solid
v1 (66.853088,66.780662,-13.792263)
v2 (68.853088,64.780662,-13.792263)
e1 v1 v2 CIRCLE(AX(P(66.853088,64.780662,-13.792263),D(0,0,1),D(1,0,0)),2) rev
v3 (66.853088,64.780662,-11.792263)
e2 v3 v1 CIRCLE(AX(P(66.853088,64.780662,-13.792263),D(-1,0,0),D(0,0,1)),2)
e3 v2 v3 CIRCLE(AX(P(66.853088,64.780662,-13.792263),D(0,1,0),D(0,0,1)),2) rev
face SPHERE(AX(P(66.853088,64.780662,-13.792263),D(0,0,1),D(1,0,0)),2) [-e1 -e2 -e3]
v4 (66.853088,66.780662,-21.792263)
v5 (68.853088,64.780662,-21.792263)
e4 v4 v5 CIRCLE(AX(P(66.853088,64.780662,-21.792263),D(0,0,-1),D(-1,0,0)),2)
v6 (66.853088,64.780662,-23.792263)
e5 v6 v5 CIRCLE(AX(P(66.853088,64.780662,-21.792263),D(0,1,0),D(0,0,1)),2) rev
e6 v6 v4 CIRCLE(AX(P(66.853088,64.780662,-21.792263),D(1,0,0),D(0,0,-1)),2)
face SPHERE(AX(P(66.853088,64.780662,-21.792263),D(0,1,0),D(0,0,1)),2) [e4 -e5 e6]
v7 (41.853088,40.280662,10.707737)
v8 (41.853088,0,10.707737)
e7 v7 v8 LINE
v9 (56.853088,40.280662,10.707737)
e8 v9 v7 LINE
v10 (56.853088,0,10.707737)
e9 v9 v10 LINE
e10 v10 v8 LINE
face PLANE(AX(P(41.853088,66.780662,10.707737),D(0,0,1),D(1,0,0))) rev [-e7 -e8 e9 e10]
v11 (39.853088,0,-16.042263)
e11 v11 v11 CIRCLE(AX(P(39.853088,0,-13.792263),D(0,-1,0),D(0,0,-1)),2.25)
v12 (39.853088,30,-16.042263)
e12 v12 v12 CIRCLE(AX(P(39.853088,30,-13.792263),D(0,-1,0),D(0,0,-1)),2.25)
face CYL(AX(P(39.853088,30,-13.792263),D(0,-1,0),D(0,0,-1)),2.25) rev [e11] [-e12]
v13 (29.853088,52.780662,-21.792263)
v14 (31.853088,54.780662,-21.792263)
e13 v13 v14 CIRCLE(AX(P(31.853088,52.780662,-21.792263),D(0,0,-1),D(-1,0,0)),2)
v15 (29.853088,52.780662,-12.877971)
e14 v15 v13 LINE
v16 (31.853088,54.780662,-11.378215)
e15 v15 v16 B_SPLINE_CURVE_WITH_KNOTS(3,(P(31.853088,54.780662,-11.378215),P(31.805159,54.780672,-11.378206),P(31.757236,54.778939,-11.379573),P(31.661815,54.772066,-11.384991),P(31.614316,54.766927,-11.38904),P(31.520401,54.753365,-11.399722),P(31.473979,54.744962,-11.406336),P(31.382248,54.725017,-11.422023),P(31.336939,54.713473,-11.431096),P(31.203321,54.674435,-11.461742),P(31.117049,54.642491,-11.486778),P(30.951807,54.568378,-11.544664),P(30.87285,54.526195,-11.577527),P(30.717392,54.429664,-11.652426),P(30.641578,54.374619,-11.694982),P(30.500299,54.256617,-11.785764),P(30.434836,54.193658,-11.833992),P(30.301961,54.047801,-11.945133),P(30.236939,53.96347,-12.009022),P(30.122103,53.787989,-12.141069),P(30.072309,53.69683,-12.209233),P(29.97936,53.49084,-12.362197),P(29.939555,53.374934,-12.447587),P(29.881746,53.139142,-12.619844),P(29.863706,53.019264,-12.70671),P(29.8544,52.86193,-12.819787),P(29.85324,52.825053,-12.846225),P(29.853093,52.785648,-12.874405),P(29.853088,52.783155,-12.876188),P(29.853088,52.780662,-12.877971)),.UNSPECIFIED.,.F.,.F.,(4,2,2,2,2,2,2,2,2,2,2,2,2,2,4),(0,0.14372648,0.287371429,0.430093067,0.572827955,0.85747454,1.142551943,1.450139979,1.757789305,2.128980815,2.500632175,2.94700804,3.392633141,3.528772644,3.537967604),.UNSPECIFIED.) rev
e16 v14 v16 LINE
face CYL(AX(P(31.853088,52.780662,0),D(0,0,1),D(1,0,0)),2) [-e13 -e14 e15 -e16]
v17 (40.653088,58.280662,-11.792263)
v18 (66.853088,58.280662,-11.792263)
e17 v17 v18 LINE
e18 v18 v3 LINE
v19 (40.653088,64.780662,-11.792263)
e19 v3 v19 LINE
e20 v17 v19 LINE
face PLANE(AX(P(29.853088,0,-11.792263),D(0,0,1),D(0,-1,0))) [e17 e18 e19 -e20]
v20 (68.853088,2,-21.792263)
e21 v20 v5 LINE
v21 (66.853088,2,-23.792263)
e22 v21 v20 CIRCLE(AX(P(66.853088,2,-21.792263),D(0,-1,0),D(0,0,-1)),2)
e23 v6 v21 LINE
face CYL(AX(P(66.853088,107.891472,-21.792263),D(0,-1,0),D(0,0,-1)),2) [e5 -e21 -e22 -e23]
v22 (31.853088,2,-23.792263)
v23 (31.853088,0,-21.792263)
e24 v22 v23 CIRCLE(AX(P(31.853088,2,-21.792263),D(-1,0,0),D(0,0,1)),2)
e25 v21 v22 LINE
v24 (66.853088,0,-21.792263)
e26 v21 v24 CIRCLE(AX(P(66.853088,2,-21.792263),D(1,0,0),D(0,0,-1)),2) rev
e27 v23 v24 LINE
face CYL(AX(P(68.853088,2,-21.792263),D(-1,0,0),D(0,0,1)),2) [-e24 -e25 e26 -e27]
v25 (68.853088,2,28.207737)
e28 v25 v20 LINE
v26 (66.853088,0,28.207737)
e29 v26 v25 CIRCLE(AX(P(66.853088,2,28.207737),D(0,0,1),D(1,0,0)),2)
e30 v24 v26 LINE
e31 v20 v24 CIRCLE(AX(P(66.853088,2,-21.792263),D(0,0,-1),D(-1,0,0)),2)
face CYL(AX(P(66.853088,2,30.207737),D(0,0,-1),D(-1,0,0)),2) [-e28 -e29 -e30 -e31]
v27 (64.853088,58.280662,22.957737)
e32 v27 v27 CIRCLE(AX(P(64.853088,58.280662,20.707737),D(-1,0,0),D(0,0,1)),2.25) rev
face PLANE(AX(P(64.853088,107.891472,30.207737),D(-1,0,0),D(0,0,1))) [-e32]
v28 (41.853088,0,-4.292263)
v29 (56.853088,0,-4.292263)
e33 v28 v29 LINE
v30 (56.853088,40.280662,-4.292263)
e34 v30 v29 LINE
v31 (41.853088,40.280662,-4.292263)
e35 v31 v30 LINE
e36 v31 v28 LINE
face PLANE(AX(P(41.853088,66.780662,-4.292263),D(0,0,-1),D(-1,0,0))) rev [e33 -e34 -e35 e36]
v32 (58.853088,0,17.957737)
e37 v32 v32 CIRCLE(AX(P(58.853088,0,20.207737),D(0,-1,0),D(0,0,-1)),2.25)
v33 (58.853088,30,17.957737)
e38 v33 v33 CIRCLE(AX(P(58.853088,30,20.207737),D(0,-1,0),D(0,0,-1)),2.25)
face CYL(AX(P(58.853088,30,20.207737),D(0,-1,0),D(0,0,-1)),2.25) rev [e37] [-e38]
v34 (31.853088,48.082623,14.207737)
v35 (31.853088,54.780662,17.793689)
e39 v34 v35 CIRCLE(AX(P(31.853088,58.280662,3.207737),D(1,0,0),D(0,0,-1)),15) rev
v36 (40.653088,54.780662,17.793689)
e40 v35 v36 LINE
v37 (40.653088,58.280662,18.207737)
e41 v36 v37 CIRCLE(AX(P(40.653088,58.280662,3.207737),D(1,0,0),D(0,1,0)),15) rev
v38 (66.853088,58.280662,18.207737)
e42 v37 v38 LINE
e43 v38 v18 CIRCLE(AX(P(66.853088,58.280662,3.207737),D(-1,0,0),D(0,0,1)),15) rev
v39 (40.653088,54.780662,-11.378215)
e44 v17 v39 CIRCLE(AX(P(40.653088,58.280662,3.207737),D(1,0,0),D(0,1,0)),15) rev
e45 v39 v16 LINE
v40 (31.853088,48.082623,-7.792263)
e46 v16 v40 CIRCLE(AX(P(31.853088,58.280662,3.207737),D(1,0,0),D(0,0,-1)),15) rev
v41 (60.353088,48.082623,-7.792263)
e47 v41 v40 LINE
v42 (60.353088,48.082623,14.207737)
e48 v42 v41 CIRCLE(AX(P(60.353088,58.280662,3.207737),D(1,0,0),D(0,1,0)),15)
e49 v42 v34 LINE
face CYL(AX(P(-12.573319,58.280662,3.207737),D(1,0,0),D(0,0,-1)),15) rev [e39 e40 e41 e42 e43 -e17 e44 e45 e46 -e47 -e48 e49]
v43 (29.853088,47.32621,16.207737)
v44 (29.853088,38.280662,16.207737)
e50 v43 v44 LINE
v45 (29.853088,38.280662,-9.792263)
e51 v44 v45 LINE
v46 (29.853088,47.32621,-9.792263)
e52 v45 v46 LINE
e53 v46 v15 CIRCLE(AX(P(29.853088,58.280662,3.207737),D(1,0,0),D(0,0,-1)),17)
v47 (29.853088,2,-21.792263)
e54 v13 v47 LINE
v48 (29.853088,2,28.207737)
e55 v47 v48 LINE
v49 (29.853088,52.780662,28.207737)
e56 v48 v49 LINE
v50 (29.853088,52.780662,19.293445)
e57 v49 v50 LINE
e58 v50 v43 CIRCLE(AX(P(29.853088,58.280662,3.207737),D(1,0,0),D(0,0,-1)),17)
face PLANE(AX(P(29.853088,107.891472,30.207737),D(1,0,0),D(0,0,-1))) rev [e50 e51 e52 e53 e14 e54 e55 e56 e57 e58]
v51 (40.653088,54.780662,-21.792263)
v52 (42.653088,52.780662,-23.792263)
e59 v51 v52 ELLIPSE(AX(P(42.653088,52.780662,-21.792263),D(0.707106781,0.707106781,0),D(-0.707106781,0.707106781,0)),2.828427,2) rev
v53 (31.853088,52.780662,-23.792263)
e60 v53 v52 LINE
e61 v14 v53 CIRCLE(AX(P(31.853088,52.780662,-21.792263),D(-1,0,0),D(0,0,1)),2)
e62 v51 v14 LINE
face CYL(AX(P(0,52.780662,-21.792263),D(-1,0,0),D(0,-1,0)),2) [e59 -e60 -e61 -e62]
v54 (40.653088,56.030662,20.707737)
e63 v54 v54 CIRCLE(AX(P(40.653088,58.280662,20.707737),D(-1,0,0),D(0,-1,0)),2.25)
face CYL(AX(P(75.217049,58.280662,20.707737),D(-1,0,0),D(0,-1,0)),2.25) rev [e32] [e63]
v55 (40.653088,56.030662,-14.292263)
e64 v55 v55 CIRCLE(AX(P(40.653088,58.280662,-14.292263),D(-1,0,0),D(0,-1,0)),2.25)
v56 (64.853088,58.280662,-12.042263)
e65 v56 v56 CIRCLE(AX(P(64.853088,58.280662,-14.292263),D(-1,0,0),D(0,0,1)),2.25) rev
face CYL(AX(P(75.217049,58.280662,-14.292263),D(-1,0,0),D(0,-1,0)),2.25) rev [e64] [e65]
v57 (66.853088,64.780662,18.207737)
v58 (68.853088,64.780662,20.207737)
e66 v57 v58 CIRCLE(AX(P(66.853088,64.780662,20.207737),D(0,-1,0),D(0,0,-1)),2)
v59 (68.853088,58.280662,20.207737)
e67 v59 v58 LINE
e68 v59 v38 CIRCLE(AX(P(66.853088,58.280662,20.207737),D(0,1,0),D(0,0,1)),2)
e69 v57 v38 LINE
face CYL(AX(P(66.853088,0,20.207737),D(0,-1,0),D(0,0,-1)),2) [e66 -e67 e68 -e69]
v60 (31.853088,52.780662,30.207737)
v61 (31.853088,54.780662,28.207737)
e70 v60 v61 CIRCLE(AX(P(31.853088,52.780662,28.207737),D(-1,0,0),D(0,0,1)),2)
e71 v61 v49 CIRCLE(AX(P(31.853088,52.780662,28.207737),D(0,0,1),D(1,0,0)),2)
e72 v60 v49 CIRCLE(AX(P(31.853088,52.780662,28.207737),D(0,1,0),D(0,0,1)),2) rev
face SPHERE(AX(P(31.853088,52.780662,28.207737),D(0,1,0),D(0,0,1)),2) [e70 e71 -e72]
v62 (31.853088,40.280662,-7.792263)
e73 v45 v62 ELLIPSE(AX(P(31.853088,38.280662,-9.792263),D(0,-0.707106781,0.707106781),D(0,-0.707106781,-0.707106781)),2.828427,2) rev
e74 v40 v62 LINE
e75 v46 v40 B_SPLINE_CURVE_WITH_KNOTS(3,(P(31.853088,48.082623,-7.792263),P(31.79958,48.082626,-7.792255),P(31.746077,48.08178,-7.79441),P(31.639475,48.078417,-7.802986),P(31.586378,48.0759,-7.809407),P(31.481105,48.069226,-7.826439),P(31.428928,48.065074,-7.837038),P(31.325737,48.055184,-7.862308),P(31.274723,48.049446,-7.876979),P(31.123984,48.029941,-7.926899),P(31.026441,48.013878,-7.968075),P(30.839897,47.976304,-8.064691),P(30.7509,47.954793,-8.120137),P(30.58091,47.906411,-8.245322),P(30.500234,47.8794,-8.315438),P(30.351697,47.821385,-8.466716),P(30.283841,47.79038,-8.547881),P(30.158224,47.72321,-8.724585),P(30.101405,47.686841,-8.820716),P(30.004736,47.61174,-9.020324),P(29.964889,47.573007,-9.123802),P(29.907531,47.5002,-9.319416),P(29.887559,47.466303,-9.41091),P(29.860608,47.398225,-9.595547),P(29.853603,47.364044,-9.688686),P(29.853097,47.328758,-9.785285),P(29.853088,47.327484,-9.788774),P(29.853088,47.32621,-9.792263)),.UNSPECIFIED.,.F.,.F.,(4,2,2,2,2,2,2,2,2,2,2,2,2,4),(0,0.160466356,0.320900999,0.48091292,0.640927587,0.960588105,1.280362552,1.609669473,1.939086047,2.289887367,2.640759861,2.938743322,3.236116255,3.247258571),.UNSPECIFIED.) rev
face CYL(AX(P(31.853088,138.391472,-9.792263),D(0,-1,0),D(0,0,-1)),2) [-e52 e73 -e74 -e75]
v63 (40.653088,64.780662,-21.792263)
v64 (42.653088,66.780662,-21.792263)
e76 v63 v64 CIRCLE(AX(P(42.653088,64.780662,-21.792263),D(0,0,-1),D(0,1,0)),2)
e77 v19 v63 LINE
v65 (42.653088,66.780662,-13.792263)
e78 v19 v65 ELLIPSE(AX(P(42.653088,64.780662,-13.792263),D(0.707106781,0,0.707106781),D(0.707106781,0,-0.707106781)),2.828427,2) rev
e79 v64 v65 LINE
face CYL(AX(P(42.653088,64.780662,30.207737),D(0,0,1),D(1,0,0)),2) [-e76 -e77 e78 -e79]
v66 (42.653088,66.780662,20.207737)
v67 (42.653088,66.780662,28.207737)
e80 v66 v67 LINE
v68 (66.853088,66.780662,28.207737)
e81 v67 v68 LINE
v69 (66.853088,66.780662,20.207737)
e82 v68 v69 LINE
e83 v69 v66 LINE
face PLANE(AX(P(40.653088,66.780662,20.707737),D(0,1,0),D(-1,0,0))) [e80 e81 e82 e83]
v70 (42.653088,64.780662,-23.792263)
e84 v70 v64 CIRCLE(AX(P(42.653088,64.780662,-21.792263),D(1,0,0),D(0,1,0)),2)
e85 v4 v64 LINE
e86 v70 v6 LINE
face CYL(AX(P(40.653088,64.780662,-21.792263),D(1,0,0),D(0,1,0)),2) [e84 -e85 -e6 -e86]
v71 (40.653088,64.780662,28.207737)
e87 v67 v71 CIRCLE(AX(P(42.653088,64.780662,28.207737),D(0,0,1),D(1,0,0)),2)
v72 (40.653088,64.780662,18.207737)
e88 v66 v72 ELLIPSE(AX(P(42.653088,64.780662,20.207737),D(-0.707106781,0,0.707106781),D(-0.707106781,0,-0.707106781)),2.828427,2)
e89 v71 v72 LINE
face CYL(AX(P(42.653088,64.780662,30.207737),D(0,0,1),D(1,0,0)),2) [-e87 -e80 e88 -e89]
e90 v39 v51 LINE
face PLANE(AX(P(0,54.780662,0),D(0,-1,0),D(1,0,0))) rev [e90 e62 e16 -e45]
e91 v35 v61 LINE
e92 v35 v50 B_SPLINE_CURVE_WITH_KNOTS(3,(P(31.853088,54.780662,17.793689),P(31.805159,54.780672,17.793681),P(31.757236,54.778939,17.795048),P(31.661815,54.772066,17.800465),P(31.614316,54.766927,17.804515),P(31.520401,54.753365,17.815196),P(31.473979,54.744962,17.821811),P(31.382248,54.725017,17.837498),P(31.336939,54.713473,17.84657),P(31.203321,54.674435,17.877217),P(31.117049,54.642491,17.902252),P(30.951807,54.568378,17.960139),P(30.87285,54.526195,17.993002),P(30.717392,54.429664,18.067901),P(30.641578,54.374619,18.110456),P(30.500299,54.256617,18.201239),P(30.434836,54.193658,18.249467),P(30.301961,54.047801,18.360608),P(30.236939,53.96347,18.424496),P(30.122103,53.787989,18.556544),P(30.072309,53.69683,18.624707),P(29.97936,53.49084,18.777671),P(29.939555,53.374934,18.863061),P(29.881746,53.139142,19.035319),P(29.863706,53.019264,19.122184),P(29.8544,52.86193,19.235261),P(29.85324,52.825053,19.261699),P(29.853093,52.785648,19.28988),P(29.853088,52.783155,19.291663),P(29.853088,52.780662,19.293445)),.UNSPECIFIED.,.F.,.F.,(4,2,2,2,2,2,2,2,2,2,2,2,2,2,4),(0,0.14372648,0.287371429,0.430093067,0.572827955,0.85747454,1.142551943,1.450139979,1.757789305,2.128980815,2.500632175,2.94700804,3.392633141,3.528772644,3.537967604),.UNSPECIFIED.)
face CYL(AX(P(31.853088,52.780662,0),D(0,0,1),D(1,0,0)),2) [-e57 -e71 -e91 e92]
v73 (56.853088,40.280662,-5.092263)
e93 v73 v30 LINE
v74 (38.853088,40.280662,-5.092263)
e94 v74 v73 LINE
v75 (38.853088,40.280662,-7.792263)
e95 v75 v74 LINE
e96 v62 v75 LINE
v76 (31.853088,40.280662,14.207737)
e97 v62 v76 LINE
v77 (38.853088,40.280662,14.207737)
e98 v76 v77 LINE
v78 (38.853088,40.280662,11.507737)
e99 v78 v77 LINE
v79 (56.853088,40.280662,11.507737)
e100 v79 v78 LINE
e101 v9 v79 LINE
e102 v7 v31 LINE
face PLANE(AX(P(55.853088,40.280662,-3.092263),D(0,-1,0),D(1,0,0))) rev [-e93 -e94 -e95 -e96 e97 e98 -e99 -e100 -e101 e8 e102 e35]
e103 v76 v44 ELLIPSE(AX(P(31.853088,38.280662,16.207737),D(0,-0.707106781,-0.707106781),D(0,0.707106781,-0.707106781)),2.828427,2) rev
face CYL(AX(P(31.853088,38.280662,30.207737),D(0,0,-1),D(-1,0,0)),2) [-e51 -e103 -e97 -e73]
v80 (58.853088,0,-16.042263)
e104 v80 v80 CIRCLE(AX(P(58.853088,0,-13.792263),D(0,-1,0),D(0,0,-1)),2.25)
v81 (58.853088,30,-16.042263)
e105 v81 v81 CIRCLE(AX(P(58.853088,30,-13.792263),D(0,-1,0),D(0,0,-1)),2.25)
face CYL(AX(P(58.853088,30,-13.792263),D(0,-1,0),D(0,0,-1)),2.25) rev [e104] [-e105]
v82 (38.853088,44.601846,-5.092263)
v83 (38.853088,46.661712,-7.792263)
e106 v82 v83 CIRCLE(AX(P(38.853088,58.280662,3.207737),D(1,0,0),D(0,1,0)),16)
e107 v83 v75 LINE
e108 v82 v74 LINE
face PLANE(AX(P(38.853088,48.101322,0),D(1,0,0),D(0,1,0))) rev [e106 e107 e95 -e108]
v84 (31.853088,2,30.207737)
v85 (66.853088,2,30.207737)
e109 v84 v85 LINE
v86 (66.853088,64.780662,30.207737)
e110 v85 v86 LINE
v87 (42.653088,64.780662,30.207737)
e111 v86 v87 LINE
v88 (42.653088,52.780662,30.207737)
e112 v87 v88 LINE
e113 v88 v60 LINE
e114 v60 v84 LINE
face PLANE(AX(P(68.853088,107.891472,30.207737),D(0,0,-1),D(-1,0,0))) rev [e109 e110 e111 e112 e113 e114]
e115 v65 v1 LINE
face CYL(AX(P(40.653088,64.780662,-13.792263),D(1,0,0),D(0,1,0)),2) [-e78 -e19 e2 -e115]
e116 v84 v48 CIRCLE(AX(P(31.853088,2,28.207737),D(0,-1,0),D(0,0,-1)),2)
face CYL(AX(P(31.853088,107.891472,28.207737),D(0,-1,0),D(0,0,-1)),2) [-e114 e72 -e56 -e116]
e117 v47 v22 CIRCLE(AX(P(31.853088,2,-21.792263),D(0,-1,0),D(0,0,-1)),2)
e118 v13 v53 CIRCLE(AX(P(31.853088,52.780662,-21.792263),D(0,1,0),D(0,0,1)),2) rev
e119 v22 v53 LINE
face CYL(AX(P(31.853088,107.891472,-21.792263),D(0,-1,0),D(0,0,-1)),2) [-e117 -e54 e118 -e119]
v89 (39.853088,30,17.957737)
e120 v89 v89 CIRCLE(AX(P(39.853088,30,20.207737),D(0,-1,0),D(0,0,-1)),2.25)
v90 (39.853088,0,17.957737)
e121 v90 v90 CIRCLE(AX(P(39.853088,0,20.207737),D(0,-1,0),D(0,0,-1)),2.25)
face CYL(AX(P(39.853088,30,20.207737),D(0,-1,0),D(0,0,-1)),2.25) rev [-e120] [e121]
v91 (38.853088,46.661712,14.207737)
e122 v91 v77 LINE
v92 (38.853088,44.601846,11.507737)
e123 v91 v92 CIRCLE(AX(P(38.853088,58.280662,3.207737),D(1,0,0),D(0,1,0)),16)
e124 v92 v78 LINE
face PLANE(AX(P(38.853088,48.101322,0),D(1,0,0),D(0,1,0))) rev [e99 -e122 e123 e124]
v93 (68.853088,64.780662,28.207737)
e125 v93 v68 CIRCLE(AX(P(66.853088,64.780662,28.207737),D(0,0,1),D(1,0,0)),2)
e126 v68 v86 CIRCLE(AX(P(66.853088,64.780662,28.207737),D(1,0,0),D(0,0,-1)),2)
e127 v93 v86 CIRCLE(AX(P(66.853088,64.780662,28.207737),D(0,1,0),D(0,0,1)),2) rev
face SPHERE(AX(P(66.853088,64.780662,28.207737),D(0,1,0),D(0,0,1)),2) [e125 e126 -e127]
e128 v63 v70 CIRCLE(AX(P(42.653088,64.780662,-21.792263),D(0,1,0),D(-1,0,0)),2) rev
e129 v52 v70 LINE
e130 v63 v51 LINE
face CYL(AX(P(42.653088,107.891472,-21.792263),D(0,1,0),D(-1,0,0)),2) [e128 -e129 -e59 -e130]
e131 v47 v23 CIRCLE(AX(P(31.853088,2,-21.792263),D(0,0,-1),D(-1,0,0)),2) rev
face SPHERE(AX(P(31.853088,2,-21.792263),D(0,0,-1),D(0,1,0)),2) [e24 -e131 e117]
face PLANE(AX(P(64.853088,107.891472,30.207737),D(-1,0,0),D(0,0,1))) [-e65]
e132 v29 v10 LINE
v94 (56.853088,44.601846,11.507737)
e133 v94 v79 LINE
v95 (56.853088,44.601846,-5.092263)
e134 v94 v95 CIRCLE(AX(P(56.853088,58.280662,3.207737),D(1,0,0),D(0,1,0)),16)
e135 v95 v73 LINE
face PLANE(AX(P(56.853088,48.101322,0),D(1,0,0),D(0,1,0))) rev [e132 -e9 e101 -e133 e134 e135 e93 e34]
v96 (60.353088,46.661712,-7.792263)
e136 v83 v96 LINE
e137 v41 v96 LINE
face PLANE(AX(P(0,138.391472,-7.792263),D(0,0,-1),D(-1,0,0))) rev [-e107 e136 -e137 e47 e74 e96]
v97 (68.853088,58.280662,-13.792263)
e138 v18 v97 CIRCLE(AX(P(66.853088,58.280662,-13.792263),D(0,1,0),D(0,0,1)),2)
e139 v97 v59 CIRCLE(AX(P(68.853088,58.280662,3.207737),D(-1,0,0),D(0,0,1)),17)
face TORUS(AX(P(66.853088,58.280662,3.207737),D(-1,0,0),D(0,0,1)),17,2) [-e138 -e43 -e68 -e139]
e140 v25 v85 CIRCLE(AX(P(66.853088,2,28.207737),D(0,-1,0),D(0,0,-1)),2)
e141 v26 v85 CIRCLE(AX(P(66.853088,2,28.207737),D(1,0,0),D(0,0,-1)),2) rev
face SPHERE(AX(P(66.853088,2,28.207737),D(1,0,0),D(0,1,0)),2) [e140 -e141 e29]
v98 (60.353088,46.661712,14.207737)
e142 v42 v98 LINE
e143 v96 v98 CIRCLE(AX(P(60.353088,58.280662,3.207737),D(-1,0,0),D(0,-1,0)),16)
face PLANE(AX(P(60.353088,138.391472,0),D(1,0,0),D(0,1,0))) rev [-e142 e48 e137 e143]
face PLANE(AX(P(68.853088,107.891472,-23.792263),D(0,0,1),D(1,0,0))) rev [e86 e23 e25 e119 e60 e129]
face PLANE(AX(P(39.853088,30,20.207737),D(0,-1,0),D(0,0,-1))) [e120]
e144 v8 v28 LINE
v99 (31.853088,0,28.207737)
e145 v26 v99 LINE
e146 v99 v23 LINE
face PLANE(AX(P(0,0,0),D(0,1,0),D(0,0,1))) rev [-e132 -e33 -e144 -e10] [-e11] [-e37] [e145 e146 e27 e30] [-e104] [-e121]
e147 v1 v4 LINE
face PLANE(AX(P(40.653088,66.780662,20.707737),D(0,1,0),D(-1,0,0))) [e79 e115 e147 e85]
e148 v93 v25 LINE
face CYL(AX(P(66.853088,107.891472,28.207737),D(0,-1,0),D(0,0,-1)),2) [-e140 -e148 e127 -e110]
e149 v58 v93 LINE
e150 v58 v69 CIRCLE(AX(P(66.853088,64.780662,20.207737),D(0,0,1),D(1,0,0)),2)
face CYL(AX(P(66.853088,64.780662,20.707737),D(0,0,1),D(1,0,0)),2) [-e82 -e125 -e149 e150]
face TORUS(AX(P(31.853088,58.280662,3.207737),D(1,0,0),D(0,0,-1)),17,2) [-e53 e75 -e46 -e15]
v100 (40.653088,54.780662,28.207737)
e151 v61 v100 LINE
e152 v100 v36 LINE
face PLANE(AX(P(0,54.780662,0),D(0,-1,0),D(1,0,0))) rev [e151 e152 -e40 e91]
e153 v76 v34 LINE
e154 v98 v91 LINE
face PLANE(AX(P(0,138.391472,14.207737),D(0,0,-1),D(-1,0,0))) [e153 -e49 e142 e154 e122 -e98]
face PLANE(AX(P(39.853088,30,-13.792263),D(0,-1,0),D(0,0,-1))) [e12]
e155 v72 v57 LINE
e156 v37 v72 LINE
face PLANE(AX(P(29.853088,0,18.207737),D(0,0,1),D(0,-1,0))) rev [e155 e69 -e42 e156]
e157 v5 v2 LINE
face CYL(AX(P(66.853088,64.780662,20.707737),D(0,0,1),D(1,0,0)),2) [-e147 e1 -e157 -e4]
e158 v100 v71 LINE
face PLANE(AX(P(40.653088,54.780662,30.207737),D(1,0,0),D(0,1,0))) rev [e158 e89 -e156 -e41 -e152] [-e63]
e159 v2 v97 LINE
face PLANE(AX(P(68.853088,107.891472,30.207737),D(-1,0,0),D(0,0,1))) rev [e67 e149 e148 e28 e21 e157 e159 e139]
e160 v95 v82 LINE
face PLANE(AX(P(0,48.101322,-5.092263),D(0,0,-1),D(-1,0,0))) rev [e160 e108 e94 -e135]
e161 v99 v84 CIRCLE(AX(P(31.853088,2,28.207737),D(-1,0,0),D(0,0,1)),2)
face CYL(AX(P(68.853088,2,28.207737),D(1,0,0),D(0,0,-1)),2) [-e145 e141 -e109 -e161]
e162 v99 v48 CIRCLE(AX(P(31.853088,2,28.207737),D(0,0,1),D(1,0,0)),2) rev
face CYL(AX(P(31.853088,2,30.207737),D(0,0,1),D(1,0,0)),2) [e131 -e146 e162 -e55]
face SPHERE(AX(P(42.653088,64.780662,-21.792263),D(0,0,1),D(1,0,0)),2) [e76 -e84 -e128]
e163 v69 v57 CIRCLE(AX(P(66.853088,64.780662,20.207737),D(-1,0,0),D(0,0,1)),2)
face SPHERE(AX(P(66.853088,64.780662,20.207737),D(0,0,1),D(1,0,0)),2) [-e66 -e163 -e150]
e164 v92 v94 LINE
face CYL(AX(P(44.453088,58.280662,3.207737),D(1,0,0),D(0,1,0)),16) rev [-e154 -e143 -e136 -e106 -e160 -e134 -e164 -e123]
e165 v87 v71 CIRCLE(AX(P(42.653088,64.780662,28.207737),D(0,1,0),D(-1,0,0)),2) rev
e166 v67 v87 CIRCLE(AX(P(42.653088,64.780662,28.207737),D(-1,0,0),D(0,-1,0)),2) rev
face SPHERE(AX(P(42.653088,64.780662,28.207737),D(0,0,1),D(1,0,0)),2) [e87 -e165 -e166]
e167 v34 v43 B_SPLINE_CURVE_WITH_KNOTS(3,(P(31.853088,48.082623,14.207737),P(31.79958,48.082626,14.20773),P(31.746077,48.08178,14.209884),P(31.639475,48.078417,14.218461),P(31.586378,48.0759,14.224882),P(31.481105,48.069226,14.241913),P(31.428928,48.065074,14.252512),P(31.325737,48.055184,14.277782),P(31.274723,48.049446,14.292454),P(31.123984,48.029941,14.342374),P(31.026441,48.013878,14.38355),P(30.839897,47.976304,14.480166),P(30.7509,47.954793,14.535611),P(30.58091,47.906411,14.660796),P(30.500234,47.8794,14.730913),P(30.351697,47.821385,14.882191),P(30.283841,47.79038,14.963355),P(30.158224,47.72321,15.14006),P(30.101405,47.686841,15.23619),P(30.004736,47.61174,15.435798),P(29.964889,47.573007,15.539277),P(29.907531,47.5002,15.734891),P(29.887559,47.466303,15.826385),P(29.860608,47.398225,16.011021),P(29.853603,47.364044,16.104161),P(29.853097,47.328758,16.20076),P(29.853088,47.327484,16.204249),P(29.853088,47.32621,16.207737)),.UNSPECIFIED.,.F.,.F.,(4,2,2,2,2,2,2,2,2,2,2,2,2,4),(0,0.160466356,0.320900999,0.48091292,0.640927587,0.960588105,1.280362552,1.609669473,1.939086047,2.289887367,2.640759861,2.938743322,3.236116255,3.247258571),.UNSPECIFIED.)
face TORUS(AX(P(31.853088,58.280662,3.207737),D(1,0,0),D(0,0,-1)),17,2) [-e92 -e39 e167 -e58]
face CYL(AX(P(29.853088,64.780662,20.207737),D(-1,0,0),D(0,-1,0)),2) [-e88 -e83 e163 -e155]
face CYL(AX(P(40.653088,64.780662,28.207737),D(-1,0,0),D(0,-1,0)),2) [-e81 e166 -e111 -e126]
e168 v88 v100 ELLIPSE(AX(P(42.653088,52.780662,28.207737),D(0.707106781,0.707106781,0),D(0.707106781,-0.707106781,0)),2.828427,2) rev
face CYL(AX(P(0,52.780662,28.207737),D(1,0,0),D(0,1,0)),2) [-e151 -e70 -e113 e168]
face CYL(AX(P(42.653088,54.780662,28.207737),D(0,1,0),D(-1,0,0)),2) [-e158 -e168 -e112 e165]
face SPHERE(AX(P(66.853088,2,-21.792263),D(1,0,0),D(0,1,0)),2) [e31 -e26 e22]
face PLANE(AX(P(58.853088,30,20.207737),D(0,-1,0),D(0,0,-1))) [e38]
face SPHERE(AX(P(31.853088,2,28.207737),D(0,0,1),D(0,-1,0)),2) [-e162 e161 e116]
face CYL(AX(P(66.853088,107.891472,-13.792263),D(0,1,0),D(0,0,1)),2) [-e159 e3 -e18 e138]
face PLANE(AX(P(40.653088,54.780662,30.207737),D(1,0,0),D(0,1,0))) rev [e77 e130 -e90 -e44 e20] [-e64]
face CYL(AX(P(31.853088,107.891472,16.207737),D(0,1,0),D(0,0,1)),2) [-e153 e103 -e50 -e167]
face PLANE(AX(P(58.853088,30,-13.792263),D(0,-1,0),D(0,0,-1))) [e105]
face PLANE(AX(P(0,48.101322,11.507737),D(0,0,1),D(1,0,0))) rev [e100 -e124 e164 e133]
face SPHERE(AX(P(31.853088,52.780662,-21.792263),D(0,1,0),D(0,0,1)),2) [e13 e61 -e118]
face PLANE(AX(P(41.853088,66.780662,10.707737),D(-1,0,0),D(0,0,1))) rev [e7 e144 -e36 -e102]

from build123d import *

# Parameters (mm, degrees)
CROQUIS18_W                  = 39
CROQUIS18_H                  = 54
SALIENTE_EXTRUIR8_DEPTH      = 40.280661595
SALIENTE_EXTRUIR9_REACH      = 87.298
SALIENTE_EXTRUIR9_END_RADIUS = 16
SALIENTE_EXTRUIR10_DEPTH     = 26.5
CORTAR_EXTRUIR8_START        = -39
CROQUIS22_R                  = 15
CORTAR_EXTRUIR8_DEPTH        = 39
CORTAR_EXTRUIR9_DEPTH        = 84.025081472
CROQUIS24_W                  = 10.8
CROQUIS24_H                  = 54
CORTAR_EXTRUIR10_DEPTH       = 12
CROQUIS25_R                  = 2.25
CORTAR_EXTRUIR11_DEPTH       = 24.2
REDONDEO1_R                  = 2
REDONDEO2_R                  = 2
CROQUIS26_R                  = 2.25
CORTAR_EXTRUIR12_DEPTH       = 30
CROQUIS27_W                  = 15
CROQUIS27_H                  = 15
CORTAR_EXTRUIR13_DEPTH       = 101.562974791


with BuildPart() as part:
    # Croquis18 → Saliente-Extruir8 (new body)
    with BuildSketch(Plane(origin=(0, 0, 0), x_dir=(1, 0, 0), z_dir=(0, 1, 0))):
        with Locations((49.353088131, -3.207737261)):
            Rectangle(CROQUIS18_W, CROQUIS18_H)
    extrude(amount=SALIENTE_EXTRUIR8_DEPTH)

    # Saliente-Extruir9: up to this cylinder (the profile starts outside it)
    saliente_extruir9_end = Plane(origin=(39.1607, 58.280661595, 3.207737261), z_dir=(1, 0, 0)) * Cylinder(SALIENTE_EXTRUIR9_END_RADIUS, 207.596, mode=Mode.PRIVATE)
    # Croquis20 → Saliente-Extruir9 (add, up to the surface)
    with BuildSketch(Plane(origin=(0, 40.280661595, 0), x_dir=(1, 0, 0), z_dir=(0, 1, 0)), mode=Mode.PRIVATE) as saliente_extruir9_sk1:
        Polygon((38.853088131, -11.507737261), (38.853088131, -14.207737261), (60.353088131, -14.207737261), (60.353088131, 7.792262739), (38.853088131, 7.792262739), (38.853088131, 5.092262739), (56.853088131, 5.092262739), (56.853088131, -11.507737261), align=None)
    saliente_extruir9_tool1 = extrude(saliente_extruir9_sk1.sketch, amount=SALIENTE_EXTRUIR9_REACH, mode=Mode.PRIVATE) - saliente_extruir9_end
    add(saliente_extruir9_tool1.solids().sort_by_distance((39.1607, 40.280662, 12.857737))[0])

    # Croquis21 → Saliente-Extruir10 (add)
    with BuildSketch(Plane(origin=(0, 40.280661595, 0), x_dir=(1, 0, 0), z_dir=(0, 1, 0))):
        Polygon((68.853088131, 23.792262739), (29.853088131, 23.792262739), (29.853088131, 7.792262739), (60.353088131, 7.792262739), (60.353088131, -14.207737261), (29.853088131, -14.207737261), (29.853088131, -30.207737261), (68.853088131, -30.207737261), align=None)
    extrude(amount=SALIENTE_EXTRUIR10_DEPTH)

    # Croquis22 → Cortar-Extruir8 (cut)
    with BuildSketch(Plane(origin=(68.853088131, 0, 0), x_dir=(0, 0, -1), z_dir=(1, 0, 0)).offset(CORTAR_EXTRUIR8_START)):
        with Locations((-3.207737261, 58.280661595)):
            Circle(CROQUIS22_R)
    extrude(amount=CORTAR_EXTRUIR8_DEPTH, mode=Mode.SUBTRACT)

    # Croquis23 → Cortar-Extruir9 (cut, through all)
    with BuildSketch(Plane(origin=(68.853088131, 0, 0), x_dir=(0, 0, -1), z_dir=(1, 0, 0))):
        with BuildLine():
            Line((-15.566944355, 66.780661595), (-18.207737261, 66.780661595))
            Line((-18.207737261, 66.780661595), (-18.207737261, 58.280661595))
            ThreePointArc((-18.207737261, 58.280661595), (-17.532333353, 62.731048859), (-15.566944355, 66.780661595))
        make_face()
        with BuildLine():
            ThreePointArc((9.151469833, 66.780661595), (11.116858831, 62.731048859), (11.792262739, 58.280661595))
            Line((11.792262739, 58.280661595), (11.792262739, 66.780661595))
            Line((11.792262739, 66.780661595), (9.151469833, 66.780661595))
        make_face()
    extrude(amount=-CORTAR_EXTRUIR9_DEPTH, mode=Mode.SUBTRACT)

    # Croquis24 → Cortar-Extruir10 (cut)
    with BuildSketch(Plane(origin=(0, 66.780661595, 0), x_dir=(1, 0, 0), z_dir=(0, 1, 0))):
        with Locations((35.253088131, -3.207737261)):
            Rectangle(CROQUIS24_W, CROQUIS24_H)
    extrude(amount=-CORTAR_EXTRUIR10_DEPTH, mode=Mode.SUBTRACT)

    # Croquis25 → Cortar-Extruir11 (cut)
    with BuildSketch(Plane.ZY.offset(-40.653088131)):
        with Locations(Location((20.707737261, 58.280661595, 0), (0, 0, 270))):
            Circle(CROQUIS25_R)
        with Locations(Location((-14.292262739, 58.280661595, 0), (0, 0, 270))):
            Circle(CROQUIS25_R)
    extrude(amount=-CORTAR_EXTRUIR11_DEPTH, mode=Mode.SUBTRACT)

    # Redondeo1
    redondeo1_edges = [part.edges().sort_by_distance(p)[0] for p in [
        (68.853088131, 62.530661595, 18.207737261),
        (68.853088131, 62.530661595, -11.792262739),
        (68.853088131, 33.390330798, -23.792262739),
        (54.753088131, 66.780661595, 30.207737261),
        (29.853088131, 27.390330798, 30.207737261),
        (68.853088131, 33.390330798, 30.207737261),
        (29.853088131, 27.390330798, -23.792262739),
        (29.853088131, 51.200842989, -10.016338076),
        (29.853088131, 54.780661595, -17.585238812),
        (29.853088131, 54.780661595, 24.000713334),
        (40.653088131, 60.780661595, -23.792262739),
        (35.253088131, 54.780661595, -23.792262739),
        (35.253088131, 54.780661595, 30.207737261),
        (40.653088131, 60.780661595, 30.207737261),
        (29.853088131, 40.280661595, 3.207737261),
        (49.353088131, 0, -23.792262739),
        (68.853088131, 0, 3.207737261),
        (68.853088131, 66.780661595, 24.207737261),
        (54.753088131, 66.780661595, -23.792262739),
        (49.353088131, 0, 30.207737261),
        (29.853088131, 0, 3.207737261),
        (29.853088131, 44.181642082, -7.792262739),
        (29.853088131, 44.181642082, 14.207737261),
        (29.853088131, 51.200842989, 16.431812597),
        (68.853088131, 43.280661596, 3.207737261),
        (68.853088131, 66.780661595, -17.792262739),
    ]]
    fillet(redondeo1_edges, radius=REDONDEO1_R)

    # Redondeo2
    # the kernel refuses this fillet: 2 mm, written as the material it takes off along each edge
    with BuildSketch(Plane(origin=(66.853088131, 64.780661595, -13.792262739), x_dir=(0, 1, 0), z_dir=(0, 0, 1))) as redondeo2_piece_1_section:
        Polygon((0, 0), (REDONDEO2_R, 0), (REDONDEO2_R, -REDONDEO2_R), (0, -REDONDEO2_R), align=None)
    redondeo2_piece_1 = extrude(amount=REDONDEO2_R, mode=Mode.PRIVATE)
    redondeo2_piece_1 = redondeo2_piece_1 - Plane(origin=(66.853088131, 64.780661595, -13.792262739), x_dir=(-0.7071067811865475, -0.7071067811865476, 0), z_dir=(0, 0, 1)) * Sphere(REDONDEO2_R, mode=Mode.PRIVATE)
    add(redondeo2_piece_1, mode=Mode.SUBTRACT)
    with BuildSketch(Plane(origin=(66.853088131, 64.780661595, 20.207737261), x_dir=(0, 0, -1), z_dir=(0, 1, 0))) as redondeo2_piece_2_section:
        Polygon((0, 0), (REDONDEO2_R, 0), (REDONDEO2_R, -REDONDEO2_R), (0, -REDONDEO2_R), align=None)
    redondeo2_piece_2 = extrude(amount=REDONDEO2_R, mode=Mode.PRIVATE)
    redondeo2_piece_2 = redondeo2_piece_2 - Plane(origin=(66.853088131, 64.780661595, 20.207737261), x_dir=(-0.7071067811865475, 0, 0.7071067811865475), z_dir=(0, 1, 0)) * Sphere(REDONDEO2_R, mode=Mode.PRIVATE)
    add(redondeo2_piece_2, mode=Mode.SUBTRACT)
    with BuildSketch(Plane(origin=(42.653088131, 64.780661595, -21.792262739), x_dir=(0, 1, 0), z_dir=(-1, 0, 0))) as redondeo2_piece_3_section:
        Polygon((0, 0), (REDONDEO2_R, 0), (REDONDEO2_R, REDONDEO2_R), (0, REDONDEO2_R), align=None)
    redondeo2_piece_3 = extrude(amount=REDONDEO2_R, mode=Mode.PRIVATE)
    redondeo2_piece_3 = redondeo2_piece_3 - Plane(origin=(42.653088131, 64.780661595, -21.792262739), x_dir=(0, -0.7071067811865475, 0.7071067811865475), z_dir=(-1, 0, 0)) * Sphere(REDONDEO2_R, mode=Mode.PRIVATE)
    add(redondeo2_piece_3, mode=Mode.SUBTRACT)
    with BuildSketch(Plane(origin=(42.653088131, 64.780661595, 28.207737261), x_dir=(-1, 0, 0), z_dir=(0, 1, 0))) as redondeo2_piece_4_section:
        Polygon((0, 0), (REDONDEO2_R, 0), (REDONDEO2_R, REDONDEO2_R), (0, REDONDEO2_R), align=None)
    redondeo2_piece_4 = extrude(amount=REDONDEO2_R, mode=Mode.PRIVATE)
    redondeo2_piece_4 = redondeo2_piece_4 - Plane(origin=(42.653088131, 64.780661595, 28.207737261), x_dir=(0.7071067811865475, 0, -0.7071067811865476), z_dir=(0, 1, 0)) * Sphere(REDONDEO2_R, mode=Mode.PRIVATE)
    add(redondeo2_piece_4, mode=Mode.SUBTRACT)
    with BuildSketch(Plane(origin=(66.853088131, 66.780661595, 18.207737261), x_dir=(0, -1.5546675058430992e-10, 1.0), z_dir=(-1, 0, 0)), Plane(origin=(66.853088131, 66.780661595, -11.792262739), x_dir=(0, -1, 0), z_dir=(-1, 0, 0))) as redondeo2_piece_5:
        with BuildLine():
            CenterArc((REDONDEO2_R, -REDONDEO2_R), REDONDEO2_R, 90.000000009, 90)
            Line((REDONDEO2_R * 1.55466750608e-10, -REDONDEO2_R), (0, 0))
            Line((0, 0), (REDONDEO2_R, 0))
        make_face()
    extrude(amount=31.200000001, mode=Mode.SUBTRACT)
    with BuildSketch(Plane(origin=(40.653088131, 66.780661595, -6.792262738), x_dir=(0, -1, 0), z_dir=(0, 0, -1))) as redondeo2_piece_6:
        with BuildLine():
            CenterArc((REDONDEO2_R, -REDONDEO2_R), REDONDEO2_R, 90, 90)
            Line((0, -REDONDEO2_R), (0, 0))
            Line((0, 0), (REDONDEO2_R, 0))
        make_face()
    extrude(amount=15.000000001, mode=Mode.SUBTRACT)
    with BuildSketch(Plane(origin=(40.653088131, 66.780661595, 28.207737261), x_dir=(1.0, -1.5546675058430992e-10, 0), z_dir=(0, 0, -1))) as redondeo2_piece_7:
        with BuildLine():
            CenterArc((REDONDEO2_R, REDONDEO2_R), REDONDEO2_R, 179.999999991, 90)
            Line((REDONDEO2_R * 1.55466750608e-10, REDONDEO2_R), (0, 0))
            Line((0, 0), (REDONDEO2_R, 0))
        make_face()
    extrude(amount=15.000000001, mode=Mode.SUBTRACT)

    # Croquis26 → Cortar-Extruir12 (cut)
    with BuildSketch(Plane.XZ):
        with Locations(Location((39.853088131, 20.207737261, 0), (0, 0, 270))):
            Circle(CROQUIS26_R)
        with Locations(Location((58.853088131, 20.207737261, 0), (0, 0, 270))):
            Circle(CROQUIS26_R)
        with Locations(Location((39.853088131, -13.792262739, 0), (0, 0, 270))):
            Circle(CROQUIS26_R)
        with Locations(Location((58.853088131, -13.792262739, 0), (0, 0, 270))):
            Circle(CROQUIS26_R)
    extrude(amount=-CORTAR_EXTRUIR12_DEPTH, mode=Mode.SUBTRACT)

    # Croquis27 → Cortar-Extruir13 (cut, through all)
    with BuildSketch(Plane.XZ):
        with Locations((49.353088131, 3.207737261)):
            Rectangle(CROQUIS27_W, CROQUIS27_H)
    extrude(amount=-CORTAR_EXTRUIR13_DEPTH, mode=Mode.SUBTRACT)


solid = part.part
